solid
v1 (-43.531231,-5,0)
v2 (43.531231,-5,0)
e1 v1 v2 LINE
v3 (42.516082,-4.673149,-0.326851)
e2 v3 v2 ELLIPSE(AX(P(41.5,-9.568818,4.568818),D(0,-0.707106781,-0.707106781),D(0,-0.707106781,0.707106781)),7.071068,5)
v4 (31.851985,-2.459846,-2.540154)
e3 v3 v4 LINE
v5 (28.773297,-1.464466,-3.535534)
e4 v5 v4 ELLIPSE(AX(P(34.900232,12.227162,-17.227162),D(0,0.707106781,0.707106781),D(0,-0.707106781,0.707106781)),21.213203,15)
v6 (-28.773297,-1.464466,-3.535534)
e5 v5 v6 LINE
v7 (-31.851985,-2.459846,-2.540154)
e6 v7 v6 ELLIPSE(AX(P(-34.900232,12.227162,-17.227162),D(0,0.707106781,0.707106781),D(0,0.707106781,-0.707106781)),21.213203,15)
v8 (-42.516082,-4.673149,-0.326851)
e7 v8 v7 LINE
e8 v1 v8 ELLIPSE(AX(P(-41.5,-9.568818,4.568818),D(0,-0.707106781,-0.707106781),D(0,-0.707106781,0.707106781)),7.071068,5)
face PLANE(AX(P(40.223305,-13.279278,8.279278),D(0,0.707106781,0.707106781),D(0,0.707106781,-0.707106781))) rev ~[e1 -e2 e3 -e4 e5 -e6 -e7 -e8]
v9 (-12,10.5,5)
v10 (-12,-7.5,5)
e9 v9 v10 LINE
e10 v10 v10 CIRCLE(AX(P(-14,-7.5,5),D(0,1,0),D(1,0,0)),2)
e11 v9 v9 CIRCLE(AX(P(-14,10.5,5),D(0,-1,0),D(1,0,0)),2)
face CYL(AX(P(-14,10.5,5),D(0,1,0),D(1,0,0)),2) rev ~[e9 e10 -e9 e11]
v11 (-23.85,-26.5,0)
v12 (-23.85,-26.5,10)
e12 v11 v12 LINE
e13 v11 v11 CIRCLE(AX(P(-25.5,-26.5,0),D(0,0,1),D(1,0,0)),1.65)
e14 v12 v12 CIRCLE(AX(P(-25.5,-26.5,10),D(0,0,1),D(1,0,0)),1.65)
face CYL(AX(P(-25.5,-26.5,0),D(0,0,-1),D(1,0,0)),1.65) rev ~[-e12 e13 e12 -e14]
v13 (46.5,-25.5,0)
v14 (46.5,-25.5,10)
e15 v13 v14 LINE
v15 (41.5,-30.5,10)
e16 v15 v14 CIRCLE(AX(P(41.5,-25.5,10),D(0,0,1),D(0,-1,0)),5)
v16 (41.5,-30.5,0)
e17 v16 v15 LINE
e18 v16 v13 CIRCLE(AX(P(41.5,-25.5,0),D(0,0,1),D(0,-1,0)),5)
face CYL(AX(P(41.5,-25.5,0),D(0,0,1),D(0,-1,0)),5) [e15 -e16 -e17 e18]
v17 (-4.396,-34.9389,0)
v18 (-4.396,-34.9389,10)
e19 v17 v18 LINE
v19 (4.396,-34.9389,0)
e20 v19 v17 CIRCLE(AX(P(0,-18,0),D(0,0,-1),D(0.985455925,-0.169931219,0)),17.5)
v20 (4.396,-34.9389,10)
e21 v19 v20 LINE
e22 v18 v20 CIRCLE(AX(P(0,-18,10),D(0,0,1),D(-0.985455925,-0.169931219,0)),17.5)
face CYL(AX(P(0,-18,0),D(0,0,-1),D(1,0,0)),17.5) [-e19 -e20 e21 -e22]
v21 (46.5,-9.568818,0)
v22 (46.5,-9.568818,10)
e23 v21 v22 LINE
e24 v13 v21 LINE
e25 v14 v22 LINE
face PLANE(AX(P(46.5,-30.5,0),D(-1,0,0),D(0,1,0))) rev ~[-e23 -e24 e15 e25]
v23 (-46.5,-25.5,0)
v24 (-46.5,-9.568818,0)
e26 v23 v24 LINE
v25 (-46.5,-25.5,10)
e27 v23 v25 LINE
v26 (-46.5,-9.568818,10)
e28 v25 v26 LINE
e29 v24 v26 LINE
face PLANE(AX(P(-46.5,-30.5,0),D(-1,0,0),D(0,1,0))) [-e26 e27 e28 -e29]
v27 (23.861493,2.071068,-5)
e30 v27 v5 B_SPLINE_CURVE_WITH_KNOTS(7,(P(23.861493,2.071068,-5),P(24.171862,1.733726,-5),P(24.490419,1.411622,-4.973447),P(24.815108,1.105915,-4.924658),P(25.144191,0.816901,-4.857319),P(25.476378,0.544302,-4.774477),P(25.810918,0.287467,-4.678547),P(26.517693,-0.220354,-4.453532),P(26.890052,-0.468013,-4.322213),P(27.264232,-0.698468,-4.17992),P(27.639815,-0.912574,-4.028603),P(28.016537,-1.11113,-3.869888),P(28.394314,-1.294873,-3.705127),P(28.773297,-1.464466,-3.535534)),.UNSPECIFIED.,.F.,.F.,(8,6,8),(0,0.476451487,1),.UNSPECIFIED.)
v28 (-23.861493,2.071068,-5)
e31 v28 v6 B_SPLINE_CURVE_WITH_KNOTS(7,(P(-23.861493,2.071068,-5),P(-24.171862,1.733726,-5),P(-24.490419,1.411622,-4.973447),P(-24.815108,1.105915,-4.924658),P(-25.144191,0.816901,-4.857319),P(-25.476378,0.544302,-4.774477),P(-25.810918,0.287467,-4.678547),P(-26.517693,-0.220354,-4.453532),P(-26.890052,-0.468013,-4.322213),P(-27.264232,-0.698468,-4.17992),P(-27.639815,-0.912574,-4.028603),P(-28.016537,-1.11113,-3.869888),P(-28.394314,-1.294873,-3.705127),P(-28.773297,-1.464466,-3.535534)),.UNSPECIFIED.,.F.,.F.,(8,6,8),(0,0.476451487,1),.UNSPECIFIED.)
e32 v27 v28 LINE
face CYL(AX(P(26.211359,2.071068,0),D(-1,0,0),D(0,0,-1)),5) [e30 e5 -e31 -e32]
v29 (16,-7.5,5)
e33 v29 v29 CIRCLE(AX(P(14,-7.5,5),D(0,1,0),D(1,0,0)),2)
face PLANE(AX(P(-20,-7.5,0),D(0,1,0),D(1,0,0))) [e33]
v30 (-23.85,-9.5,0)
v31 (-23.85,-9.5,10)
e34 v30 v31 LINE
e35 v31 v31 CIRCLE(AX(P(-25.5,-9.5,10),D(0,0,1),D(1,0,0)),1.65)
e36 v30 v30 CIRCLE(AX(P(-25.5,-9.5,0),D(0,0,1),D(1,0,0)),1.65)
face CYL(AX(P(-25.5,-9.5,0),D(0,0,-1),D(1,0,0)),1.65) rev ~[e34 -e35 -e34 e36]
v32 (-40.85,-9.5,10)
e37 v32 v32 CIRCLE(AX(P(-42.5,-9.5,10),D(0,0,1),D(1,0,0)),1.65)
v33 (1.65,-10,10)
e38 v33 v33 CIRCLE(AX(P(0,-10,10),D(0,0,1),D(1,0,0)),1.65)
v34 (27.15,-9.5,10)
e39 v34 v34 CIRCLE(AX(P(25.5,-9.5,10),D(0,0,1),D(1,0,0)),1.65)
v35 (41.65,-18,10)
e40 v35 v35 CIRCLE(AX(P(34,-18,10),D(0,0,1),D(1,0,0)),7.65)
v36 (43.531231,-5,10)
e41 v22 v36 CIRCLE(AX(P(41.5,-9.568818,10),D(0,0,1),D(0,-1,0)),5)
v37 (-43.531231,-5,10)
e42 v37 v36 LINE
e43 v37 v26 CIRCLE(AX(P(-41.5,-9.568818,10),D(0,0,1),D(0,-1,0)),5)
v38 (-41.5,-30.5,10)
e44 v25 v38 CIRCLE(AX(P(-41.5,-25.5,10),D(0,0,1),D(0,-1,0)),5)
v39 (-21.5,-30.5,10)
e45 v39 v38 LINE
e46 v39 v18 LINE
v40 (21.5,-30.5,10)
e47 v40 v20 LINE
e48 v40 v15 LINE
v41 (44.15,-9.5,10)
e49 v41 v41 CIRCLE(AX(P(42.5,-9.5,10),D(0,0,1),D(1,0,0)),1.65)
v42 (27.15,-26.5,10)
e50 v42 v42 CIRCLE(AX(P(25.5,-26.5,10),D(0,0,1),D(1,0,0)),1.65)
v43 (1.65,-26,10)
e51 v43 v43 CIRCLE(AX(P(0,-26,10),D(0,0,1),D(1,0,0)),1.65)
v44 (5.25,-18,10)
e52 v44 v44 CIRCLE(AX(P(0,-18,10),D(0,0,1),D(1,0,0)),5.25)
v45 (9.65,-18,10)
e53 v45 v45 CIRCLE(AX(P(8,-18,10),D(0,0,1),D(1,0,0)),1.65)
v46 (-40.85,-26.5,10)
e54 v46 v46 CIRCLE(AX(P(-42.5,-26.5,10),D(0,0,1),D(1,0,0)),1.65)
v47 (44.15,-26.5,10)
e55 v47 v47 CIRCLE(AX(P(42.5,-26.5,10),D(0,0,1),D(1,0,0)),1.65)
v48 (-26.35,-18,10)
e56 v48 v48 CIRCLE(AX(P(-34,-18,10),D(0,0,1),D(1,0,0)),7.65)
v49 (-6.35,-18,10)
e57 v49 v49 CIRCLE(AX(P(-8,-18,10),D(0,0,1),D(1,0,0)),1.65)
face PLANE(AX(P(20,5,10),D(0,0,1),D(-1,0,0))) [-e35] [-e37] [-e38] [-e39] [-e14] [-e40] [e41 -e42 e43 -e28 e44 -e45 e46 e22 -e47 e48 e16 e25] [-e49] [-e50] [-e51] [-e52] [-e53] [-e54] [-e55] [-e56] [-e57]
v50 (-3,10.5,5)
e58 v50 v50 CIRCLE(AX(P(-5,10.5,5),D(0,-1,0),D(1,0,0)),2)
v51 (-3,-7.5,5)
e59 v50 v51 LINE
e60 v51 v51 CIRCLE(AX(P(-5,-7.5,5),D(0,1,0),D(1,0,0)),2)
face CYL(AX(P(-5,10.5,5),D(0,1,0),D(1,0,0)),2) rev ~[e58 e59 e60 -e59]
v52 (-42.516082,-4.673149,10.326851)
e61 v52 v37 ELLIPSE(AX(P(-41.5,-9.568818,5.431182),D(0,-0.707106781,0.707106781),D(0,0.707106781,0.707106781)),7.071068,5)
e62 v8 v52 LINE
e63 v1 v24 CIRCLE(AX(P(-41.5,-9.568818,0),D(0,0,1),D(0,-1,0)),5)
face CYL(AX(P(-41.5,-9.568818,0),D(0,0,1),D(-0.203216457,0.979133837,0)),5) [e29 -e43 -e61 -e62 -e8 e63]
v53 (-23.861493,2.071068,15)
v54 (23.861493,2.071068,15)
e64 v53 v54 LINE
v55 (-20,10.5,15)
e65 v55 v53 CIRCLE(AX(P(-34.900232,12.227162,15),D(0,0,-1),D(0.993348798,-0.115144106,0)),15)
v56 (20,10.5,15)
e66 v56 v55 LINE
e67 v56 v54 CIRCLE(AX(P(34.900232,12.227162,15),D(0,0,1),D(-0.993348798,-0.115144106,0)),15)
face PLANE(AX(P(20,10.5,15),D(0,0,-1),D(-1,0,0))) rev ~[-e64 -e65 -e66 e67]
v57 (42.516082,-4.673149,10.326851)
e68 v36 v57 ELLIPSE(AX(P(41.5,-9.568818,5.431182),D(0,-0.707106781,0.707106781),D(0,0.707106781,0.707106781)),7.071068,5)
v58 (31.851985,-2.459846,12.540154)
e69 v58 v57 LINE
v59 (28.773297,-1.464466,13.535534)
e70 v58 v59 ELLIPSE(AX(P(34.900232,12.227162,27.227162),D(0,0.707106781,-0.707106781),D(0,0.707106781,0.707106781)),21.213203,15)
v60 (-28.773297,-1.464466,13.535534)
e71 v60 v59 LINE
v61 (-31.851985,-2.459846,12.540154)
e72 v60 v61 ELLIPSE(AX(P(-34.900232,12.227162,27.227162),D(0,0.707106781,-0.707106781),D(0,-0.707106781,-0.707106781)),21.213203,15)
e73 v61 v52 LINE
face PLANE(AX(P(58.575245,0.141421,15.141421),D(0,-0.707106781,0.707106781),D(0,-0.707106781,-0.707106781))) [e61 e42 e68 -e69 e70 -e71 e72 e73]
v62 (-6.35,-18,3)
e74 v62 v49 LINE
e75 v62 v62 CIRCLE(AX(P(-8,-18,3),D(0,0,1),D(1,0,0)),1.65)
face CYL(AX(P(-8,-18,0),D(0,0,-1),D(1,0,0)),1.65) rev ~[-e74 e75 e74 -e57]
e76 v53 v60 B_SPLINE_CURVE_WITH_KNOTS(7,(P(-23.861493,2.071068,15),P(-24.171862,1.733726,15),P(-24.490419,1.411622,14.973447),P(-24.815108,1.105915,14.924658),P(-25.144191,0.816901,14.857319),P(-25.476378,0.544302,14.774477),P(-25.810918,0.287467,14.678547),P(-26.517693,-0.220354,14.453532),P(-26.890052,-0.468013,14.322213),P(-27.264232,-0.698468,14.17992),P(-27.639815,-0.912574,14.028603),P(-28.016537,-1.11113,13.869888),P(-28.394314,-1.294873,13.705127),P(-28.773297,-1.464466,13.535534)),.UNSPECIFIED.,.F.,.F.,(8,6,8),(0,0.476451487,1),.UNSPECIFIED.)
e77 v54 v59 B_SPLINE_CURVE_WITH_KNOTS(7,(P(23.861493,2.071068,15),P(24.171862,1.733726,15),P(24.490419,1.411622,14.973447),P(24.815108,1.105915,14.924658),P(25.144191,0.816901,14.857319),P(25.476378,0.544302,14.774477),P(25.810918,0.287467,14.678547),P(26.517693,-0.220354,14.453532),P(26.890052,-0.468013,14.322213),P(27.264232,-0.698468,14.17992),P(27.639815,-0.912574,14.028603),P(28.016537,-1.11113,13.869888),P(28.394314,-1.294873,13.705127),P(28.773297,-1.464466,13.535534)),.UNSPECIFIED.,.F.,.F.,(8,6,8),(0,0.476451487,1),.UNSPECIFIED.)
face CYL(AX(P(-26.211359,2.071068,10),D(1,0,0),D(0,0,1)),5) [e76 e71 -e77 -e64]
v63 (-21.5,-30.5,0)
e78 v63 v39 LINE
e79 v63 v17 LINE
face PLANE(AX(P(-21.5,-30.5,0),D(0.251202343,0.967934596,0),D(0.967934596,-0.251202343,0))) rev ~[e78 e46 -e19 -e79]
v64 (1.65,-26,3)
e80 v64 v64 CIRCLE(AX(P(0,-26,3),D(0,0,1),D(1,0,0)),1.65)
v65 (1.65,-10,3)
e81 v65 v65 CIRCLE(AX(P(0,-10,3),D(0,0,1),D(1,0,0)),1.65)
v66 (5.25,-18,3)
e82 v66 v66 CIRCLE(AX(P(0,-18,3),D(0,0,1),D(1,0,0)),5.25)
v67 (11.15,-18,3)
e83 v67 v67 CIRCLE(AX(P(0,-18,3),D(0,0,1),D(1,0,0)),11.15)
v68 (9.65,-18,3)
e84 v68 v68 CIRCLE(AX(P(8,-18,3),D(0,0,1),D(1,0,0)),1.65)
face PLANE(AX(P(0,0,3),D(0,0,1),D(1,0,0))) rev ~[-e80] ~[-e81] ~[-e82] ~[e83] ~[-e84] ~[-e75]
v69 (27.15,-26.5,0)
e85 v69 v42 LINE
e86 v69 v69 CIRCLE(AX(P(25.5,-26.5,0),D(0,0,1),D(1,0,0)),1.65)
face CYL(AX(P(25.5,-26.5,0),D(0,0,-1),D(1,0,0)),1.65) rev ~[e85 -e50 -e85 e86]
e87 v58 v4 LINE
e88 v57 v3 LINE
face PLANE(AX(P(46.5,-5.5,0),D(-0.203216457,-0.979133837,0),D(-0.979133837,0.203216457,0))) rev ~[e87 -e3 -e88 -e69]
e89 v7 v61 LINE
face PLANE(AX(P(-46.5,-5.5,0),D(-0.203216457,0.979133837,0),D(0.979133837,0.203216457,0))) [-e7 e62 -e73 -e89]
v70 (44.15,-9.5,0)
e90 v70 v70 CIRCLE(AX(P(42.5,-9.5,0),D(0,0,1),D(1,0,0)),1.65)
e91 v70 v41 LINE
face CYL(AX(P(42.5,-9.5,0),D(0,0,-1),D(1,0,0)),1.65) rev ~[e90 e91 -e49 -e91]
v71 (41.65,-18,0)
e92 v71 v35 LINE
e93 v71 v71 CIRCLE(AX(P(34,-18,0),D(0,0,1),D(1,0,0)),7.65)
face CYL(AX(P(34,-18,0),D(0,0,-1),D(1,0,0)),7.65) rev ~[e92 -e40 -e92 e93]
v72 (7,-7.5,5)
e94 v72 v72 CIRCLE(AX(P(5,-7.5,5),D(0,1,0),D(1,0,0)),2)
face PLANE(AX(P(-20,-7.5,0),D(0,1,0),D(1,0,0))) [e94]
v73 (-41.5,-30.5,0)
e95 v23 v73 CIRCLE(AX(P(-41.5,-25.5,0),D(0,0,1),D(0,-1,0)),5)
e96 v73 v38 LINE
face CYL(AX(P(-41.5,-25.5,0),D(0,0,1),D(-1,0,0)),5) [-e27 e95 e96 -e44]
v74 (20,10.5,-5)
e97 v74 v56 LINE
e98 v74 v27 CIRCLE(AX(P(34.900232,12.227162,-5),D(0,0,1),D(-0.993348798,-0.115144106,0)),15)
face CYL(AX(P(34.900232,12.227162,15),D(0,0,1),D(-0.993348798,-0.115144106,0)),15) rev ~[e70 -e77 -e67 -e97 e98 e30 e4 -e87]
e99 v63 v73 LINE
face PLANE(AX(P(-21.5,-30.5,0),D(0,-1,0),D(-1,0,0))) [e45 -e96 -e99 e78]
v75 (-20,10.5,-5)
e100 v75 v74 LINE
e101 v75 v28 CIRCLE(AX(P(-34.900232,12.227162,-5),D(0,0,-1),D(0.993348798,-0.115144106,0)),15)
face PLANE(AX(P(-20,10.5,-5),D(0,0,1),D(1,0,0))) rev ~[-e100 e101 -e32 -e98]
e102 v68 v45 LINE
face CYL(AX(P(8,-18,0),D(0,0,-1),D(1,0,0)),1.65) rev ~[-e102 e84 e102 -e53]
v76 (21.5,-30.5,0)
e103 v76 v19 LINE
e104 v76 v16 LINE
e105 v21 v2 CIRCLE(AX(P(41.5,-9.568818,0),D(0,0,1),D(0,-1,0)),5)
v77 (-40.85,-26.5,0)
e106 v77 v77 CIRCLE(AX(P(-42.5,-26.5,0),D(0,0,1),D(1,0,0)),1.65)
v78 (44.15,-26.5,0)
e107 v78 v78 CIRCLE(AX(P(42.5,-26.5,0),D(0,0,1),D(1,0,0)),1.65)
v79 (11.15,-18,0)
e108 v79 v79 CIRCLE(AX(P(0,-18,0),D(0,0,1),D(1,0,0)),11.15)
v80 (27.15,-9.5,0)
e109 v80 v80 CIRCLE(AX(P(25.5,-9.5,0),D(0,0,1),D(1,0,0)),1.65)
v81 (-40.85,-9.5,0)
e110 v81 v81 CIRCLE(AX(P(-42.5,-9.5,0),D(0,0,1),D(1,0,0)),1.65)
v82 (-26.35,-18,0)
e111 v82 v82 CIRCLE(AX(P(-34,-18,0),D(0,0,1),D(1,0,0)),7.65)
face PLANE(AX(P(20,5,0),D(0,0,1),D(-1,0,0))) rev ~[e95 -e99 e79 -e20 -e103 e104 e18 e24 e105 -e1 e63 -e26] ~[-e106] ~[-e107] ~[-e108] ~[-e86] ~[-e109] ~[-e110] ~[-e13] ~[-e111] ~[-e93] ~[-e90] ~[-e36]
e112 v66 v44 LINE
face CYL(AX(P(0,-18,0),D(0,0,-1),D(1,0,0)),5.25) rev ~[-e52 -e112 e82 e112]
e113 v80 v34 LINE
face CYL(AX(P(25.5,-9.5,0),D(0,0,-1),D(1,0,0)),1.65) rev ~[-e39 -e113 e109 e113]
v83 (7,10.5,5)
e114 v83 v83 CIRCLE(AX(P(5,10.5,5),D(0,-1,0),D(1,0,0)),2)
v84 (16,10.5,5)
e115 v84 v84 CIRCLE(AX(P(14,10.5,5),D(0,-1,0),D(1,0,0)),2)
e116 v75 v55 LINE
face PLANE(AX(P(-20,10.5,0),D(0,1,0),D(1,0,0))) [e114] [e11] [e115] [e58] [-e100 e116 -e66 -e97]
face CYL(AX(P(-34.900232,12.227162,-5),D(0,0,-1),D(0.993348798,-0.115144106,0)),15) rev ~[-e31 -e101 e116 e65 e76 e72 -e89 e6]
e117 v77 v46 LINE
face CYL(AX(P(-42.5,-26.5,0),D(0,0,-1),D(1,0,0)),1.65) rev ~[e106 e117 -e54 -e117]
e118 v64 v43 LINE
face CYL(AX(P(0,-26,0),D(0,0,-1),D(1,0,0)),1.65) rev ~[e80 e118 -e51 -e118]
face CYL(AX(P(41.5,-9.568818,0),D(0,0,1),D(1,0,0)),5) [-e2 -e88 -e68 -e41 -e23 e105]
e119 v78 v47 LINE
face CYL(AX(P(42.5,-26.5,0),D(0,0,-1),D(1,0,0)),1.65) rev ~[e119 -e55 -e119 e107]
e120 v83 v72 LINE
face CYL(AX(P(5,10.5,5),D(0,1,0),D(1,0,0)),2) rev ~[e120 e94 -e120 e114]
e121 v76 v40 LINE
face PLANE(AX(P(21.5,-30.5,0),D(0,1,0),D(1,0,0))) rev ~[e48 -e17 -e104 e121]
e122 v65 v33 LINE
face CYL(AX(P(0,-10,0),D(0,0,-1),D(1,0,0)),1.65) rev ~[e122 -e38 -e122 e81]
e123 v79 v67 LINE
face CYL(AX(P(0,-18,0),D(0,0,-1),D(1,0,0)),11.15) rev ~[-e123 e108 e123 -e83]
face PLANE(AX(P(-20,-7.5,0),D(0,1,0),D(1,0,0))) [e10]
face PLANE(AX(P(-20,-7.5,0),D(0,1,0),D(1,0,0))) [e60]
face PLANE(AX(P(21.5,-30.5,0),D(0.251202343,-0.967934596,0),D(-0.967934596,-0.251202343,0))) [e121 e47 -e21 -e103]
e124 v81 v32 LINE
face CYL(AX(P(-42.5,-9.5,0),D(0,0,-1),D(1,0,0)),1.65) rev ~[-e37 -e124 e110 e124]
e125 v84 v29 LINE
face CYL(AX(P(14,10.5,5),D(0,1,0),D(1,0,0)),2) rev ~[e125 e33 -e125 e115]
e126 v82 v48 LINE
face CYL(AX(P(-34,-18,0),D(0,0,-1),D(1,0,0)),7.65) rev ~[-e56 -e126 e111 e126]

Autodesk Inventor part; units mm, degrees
ref_plane "YZ Plane" through (0, 0, 0) normal (1, 0, 0) x (0, 1, 0)
ref_plane "XZ Plane" through (0, 0, 0) normal (0, 1, 0) x (-1, 0, 0)
ref_plane "XY Plane" through (0, 0, 0) normal (0, 0, 1) x (1, 0, 0)
sketch "Sketch1" plane through (0, 0, 0) normal (0, 0, 1) x (1, 0, 0)
  line L0 (-20, -5) -> (20, -5)
  line L1 (20, -5) -> (20, 5)
  line L2 (20, 5) -> (-20, 5)
  line L3 (-20, 5) -> (-20, -5)
  line L4 (-20, -5) -> (20, 5) construction
  line L5 (20, -5) -> (-20, 5) construction
  circle A0 centre (0, -18) radius 11.15
  circle A1 centre (0, -18) radius 5.25
  circle A2 centre (0, -18) radius 17.5
  line L6 (-20, -5) -> (-17.2455, -20.9738)
  line L7 (20, -5) -> (17.2455, -20.9738)
  circle A3 centre (0, -10) radius 1.65
  circle A4 centre (-8, -18) radius 1.65
  circle A5 centre (0, -26) radius 1.65
  circle A6 centre (8, -18) radius 1.65
  circle A7 centre (34, -18) radius 7.65
  line L8 (21.5, -30.5) -> (46.5, -30.5)
  line L9 (46.5, -30.5) -> (46.5, -5.5)
  line L10 (46.5, -5.5) -> (21.5, -5.5)
  line L11 (21.5, -5.5) -> (21.5, -30.5)
  line L12 (21.5, -30.5) -> (46.5, -5.5) construction
  line L13 (46.5, -30.5) -> (21.5, -5.5) construction
  circle A8 centre (25.5, -9.5) radius 1.65
  circle A9 centre (42.5, -9.5) radius 1.65
  circle A10 centre (42.5, -26.5) radius 1.65
  circle A11 centre (25.5, -26.5) radius 1.65
  line L14 (46.5, -5.5) -> (20, 0)
  line L15 (21.5, -30.5) -> (4.396, -34.9389)
  line L16 (0, 5) -> (0, 15.3431)
  circle A12 centre (-34, -18) radius 7.65
  line L17 (-21.5, -30.5) -> (-46.5, -30.5)
  line L18 (-46.5, -30.5) -> (-46.5, -5.5)
  line L19 (-46.5, -5.5) -> (-21.5, -5.5)
  line L20 (-21.5, -5.5) -> (-21.5, -30.5)
  line L21 (-21.5, -30.5) -> (-46.5, -5.5) construction
  line L22 (-46.5, -30.5) -> (-21.5, -5.5) construction
  circle A13 centre (-25.5, -9.5) radius 1.65
  circle A14 centre (-42.5, -9.5) radius 1.65
  circle A15 centre (-42.5, -26.5) radius 1.65
  circle A16 centre (-25.5, -26.5) radius 1.65
  line L23 (-46.5, -5.5) -> (-20, 0)
  line L24 (-21.5, -30.5) -> (-4.396, -34.9389)
  point P0 (0, 0)
  point P1 (-4.396, -34.9389)
  dimension "d0" = 22.3
  dimension "d1" = 10.5
  dimension "d2" = 35
  dimension "d3" = 3.3
  dimension "d4" = 8
  dimension "d7" = 360
  dimension "d14" = 40
  dimension "d16" = 23
  dimension "d17" = 10
  dimension "d24" = 15.3
  dimension "d25" = 34
  dimension "d27" = 25
  dimension "d28" = 25
  dimension "d29" = 3.3
  dimension "d30" = 17
extrude "Extrusion1" add sketch "Sketch1" along normal blind 10 contours L3 L2 L1 L0 A2 | L0 A2 L6 | A2 L0 | L0 A2 | L0 L7 A2 | A0
extrude "Extrusion2" cut sketch "Sketch1" along normal blind 3 contours A0
extrude "Extrusion4" add sketch "Sketch1" along normal blind 10 contours L6 A2 L24 L20 L19 L23 L3 | L19 L20 L17 L18 | L1 L14 L10 L11 L15 A2 L7 | L11 L10 L9 L8
fillet "Fillet1" radius 5 4 edges at (-46.5, -5.5, 5) (-46.5, -30.5, 5) (46.5, -30.5, 5) (46.5, -5.5, 5)
sketch "Sketch4" plane through (-20, 5, 0) normal (0, 1, 0) x (1, 0, 0)
  line L0 (40, 0) -> (0, 0) projected
  line L1 (0, 0) -> (0, -10) projected
  line L2 (40, -10) -> (0, -10) projected
  line L3 (40, 0) -> (40, -10) projected
  point P0 (20, 0)
extrude "Extrusion5" add sketch "Sketch4" along normal blind 5.5
sketch "Sketch5" plane through (-20, 10.5, 0) normal (0, 1, 0) x (1, 0, 0)
  line L0 (40, 0) -> (0, 0) projected
  line L1 (0, 0) -> (0, -10) projected
  line L2 (0, -10) -> (40, -10) projected
  line L3 (40, -10) -> (40, 0) projected
  line L4 (40, 0) -> (0, -10)
  line L5 (0, 5) -> (40, 5)
  line L6 (40, 5) -> (40, -15)
  line L7 (40, -15) -> (0, -15)
  line L8 (0, -15) -> (0, 5)
  line L9 (0, 5) -> (40, -15) construction
  line L10 (40, 5) -> (0, -15) construction
  point P0 (20, 0)
  point P1 (20, -5)
extrude "Extrusion6" add sketch "Sketch5" against normal blind 10.5
chamfer "Chamfer1" distance 5 angle 45 2 edges at (0, 0, 10) (0, 0, 0)
sketch "Sketch7" plane through (-20, 10.5, 0) normal (0, 1, 0) x (1, 0, 0)
  line L0 (0, 5) -> (0, -15) projected
  line L1 (0, -15) -> (40, -15) projected
  line L2 (40, -15) -> (40, 5) projected
  line L3 (40, 5) -> (0, 5) projected
  line L4 (0, -5) -> (40, -5)
  line L5 (20, -5) -> (34, -5)
  line L6 (34, -5) -> (25, -5)
  circle A0 centre (34, -5) radius 2
  line L7 (34, -5) -> (25, -5)
  circle A1 centre (25, -5) radius 2
  line L8 (20, -5) -> (20, -8)
  circle A2 centre (6, -5) radius 2
  circle A3 centre (15, -5) radius 2
  point P0 (20, 0)
  dimension "d45" = 14
  dimension "d47" = 4
  dimension "d48" = 9
  dimension "d49" = 4
fillet "Fillet2" radius 15 2 edges at (-20, 0, 5) (20, 0, 5)
fillet "Fillet3" radius 5 2 edges at (0, 0, -5) (0, 0, 15)
extrude "Extrusion7" cut sketch "Sketch7" against normal blind 18 contours A2 L4 | L4 A2 | A0 L4 | L4 A0 | A3 L4 | L4 A3 | A1 L4 | L4 A1
properties part number "PARA_TUERCA" material "Steel, Mild, Welded"
